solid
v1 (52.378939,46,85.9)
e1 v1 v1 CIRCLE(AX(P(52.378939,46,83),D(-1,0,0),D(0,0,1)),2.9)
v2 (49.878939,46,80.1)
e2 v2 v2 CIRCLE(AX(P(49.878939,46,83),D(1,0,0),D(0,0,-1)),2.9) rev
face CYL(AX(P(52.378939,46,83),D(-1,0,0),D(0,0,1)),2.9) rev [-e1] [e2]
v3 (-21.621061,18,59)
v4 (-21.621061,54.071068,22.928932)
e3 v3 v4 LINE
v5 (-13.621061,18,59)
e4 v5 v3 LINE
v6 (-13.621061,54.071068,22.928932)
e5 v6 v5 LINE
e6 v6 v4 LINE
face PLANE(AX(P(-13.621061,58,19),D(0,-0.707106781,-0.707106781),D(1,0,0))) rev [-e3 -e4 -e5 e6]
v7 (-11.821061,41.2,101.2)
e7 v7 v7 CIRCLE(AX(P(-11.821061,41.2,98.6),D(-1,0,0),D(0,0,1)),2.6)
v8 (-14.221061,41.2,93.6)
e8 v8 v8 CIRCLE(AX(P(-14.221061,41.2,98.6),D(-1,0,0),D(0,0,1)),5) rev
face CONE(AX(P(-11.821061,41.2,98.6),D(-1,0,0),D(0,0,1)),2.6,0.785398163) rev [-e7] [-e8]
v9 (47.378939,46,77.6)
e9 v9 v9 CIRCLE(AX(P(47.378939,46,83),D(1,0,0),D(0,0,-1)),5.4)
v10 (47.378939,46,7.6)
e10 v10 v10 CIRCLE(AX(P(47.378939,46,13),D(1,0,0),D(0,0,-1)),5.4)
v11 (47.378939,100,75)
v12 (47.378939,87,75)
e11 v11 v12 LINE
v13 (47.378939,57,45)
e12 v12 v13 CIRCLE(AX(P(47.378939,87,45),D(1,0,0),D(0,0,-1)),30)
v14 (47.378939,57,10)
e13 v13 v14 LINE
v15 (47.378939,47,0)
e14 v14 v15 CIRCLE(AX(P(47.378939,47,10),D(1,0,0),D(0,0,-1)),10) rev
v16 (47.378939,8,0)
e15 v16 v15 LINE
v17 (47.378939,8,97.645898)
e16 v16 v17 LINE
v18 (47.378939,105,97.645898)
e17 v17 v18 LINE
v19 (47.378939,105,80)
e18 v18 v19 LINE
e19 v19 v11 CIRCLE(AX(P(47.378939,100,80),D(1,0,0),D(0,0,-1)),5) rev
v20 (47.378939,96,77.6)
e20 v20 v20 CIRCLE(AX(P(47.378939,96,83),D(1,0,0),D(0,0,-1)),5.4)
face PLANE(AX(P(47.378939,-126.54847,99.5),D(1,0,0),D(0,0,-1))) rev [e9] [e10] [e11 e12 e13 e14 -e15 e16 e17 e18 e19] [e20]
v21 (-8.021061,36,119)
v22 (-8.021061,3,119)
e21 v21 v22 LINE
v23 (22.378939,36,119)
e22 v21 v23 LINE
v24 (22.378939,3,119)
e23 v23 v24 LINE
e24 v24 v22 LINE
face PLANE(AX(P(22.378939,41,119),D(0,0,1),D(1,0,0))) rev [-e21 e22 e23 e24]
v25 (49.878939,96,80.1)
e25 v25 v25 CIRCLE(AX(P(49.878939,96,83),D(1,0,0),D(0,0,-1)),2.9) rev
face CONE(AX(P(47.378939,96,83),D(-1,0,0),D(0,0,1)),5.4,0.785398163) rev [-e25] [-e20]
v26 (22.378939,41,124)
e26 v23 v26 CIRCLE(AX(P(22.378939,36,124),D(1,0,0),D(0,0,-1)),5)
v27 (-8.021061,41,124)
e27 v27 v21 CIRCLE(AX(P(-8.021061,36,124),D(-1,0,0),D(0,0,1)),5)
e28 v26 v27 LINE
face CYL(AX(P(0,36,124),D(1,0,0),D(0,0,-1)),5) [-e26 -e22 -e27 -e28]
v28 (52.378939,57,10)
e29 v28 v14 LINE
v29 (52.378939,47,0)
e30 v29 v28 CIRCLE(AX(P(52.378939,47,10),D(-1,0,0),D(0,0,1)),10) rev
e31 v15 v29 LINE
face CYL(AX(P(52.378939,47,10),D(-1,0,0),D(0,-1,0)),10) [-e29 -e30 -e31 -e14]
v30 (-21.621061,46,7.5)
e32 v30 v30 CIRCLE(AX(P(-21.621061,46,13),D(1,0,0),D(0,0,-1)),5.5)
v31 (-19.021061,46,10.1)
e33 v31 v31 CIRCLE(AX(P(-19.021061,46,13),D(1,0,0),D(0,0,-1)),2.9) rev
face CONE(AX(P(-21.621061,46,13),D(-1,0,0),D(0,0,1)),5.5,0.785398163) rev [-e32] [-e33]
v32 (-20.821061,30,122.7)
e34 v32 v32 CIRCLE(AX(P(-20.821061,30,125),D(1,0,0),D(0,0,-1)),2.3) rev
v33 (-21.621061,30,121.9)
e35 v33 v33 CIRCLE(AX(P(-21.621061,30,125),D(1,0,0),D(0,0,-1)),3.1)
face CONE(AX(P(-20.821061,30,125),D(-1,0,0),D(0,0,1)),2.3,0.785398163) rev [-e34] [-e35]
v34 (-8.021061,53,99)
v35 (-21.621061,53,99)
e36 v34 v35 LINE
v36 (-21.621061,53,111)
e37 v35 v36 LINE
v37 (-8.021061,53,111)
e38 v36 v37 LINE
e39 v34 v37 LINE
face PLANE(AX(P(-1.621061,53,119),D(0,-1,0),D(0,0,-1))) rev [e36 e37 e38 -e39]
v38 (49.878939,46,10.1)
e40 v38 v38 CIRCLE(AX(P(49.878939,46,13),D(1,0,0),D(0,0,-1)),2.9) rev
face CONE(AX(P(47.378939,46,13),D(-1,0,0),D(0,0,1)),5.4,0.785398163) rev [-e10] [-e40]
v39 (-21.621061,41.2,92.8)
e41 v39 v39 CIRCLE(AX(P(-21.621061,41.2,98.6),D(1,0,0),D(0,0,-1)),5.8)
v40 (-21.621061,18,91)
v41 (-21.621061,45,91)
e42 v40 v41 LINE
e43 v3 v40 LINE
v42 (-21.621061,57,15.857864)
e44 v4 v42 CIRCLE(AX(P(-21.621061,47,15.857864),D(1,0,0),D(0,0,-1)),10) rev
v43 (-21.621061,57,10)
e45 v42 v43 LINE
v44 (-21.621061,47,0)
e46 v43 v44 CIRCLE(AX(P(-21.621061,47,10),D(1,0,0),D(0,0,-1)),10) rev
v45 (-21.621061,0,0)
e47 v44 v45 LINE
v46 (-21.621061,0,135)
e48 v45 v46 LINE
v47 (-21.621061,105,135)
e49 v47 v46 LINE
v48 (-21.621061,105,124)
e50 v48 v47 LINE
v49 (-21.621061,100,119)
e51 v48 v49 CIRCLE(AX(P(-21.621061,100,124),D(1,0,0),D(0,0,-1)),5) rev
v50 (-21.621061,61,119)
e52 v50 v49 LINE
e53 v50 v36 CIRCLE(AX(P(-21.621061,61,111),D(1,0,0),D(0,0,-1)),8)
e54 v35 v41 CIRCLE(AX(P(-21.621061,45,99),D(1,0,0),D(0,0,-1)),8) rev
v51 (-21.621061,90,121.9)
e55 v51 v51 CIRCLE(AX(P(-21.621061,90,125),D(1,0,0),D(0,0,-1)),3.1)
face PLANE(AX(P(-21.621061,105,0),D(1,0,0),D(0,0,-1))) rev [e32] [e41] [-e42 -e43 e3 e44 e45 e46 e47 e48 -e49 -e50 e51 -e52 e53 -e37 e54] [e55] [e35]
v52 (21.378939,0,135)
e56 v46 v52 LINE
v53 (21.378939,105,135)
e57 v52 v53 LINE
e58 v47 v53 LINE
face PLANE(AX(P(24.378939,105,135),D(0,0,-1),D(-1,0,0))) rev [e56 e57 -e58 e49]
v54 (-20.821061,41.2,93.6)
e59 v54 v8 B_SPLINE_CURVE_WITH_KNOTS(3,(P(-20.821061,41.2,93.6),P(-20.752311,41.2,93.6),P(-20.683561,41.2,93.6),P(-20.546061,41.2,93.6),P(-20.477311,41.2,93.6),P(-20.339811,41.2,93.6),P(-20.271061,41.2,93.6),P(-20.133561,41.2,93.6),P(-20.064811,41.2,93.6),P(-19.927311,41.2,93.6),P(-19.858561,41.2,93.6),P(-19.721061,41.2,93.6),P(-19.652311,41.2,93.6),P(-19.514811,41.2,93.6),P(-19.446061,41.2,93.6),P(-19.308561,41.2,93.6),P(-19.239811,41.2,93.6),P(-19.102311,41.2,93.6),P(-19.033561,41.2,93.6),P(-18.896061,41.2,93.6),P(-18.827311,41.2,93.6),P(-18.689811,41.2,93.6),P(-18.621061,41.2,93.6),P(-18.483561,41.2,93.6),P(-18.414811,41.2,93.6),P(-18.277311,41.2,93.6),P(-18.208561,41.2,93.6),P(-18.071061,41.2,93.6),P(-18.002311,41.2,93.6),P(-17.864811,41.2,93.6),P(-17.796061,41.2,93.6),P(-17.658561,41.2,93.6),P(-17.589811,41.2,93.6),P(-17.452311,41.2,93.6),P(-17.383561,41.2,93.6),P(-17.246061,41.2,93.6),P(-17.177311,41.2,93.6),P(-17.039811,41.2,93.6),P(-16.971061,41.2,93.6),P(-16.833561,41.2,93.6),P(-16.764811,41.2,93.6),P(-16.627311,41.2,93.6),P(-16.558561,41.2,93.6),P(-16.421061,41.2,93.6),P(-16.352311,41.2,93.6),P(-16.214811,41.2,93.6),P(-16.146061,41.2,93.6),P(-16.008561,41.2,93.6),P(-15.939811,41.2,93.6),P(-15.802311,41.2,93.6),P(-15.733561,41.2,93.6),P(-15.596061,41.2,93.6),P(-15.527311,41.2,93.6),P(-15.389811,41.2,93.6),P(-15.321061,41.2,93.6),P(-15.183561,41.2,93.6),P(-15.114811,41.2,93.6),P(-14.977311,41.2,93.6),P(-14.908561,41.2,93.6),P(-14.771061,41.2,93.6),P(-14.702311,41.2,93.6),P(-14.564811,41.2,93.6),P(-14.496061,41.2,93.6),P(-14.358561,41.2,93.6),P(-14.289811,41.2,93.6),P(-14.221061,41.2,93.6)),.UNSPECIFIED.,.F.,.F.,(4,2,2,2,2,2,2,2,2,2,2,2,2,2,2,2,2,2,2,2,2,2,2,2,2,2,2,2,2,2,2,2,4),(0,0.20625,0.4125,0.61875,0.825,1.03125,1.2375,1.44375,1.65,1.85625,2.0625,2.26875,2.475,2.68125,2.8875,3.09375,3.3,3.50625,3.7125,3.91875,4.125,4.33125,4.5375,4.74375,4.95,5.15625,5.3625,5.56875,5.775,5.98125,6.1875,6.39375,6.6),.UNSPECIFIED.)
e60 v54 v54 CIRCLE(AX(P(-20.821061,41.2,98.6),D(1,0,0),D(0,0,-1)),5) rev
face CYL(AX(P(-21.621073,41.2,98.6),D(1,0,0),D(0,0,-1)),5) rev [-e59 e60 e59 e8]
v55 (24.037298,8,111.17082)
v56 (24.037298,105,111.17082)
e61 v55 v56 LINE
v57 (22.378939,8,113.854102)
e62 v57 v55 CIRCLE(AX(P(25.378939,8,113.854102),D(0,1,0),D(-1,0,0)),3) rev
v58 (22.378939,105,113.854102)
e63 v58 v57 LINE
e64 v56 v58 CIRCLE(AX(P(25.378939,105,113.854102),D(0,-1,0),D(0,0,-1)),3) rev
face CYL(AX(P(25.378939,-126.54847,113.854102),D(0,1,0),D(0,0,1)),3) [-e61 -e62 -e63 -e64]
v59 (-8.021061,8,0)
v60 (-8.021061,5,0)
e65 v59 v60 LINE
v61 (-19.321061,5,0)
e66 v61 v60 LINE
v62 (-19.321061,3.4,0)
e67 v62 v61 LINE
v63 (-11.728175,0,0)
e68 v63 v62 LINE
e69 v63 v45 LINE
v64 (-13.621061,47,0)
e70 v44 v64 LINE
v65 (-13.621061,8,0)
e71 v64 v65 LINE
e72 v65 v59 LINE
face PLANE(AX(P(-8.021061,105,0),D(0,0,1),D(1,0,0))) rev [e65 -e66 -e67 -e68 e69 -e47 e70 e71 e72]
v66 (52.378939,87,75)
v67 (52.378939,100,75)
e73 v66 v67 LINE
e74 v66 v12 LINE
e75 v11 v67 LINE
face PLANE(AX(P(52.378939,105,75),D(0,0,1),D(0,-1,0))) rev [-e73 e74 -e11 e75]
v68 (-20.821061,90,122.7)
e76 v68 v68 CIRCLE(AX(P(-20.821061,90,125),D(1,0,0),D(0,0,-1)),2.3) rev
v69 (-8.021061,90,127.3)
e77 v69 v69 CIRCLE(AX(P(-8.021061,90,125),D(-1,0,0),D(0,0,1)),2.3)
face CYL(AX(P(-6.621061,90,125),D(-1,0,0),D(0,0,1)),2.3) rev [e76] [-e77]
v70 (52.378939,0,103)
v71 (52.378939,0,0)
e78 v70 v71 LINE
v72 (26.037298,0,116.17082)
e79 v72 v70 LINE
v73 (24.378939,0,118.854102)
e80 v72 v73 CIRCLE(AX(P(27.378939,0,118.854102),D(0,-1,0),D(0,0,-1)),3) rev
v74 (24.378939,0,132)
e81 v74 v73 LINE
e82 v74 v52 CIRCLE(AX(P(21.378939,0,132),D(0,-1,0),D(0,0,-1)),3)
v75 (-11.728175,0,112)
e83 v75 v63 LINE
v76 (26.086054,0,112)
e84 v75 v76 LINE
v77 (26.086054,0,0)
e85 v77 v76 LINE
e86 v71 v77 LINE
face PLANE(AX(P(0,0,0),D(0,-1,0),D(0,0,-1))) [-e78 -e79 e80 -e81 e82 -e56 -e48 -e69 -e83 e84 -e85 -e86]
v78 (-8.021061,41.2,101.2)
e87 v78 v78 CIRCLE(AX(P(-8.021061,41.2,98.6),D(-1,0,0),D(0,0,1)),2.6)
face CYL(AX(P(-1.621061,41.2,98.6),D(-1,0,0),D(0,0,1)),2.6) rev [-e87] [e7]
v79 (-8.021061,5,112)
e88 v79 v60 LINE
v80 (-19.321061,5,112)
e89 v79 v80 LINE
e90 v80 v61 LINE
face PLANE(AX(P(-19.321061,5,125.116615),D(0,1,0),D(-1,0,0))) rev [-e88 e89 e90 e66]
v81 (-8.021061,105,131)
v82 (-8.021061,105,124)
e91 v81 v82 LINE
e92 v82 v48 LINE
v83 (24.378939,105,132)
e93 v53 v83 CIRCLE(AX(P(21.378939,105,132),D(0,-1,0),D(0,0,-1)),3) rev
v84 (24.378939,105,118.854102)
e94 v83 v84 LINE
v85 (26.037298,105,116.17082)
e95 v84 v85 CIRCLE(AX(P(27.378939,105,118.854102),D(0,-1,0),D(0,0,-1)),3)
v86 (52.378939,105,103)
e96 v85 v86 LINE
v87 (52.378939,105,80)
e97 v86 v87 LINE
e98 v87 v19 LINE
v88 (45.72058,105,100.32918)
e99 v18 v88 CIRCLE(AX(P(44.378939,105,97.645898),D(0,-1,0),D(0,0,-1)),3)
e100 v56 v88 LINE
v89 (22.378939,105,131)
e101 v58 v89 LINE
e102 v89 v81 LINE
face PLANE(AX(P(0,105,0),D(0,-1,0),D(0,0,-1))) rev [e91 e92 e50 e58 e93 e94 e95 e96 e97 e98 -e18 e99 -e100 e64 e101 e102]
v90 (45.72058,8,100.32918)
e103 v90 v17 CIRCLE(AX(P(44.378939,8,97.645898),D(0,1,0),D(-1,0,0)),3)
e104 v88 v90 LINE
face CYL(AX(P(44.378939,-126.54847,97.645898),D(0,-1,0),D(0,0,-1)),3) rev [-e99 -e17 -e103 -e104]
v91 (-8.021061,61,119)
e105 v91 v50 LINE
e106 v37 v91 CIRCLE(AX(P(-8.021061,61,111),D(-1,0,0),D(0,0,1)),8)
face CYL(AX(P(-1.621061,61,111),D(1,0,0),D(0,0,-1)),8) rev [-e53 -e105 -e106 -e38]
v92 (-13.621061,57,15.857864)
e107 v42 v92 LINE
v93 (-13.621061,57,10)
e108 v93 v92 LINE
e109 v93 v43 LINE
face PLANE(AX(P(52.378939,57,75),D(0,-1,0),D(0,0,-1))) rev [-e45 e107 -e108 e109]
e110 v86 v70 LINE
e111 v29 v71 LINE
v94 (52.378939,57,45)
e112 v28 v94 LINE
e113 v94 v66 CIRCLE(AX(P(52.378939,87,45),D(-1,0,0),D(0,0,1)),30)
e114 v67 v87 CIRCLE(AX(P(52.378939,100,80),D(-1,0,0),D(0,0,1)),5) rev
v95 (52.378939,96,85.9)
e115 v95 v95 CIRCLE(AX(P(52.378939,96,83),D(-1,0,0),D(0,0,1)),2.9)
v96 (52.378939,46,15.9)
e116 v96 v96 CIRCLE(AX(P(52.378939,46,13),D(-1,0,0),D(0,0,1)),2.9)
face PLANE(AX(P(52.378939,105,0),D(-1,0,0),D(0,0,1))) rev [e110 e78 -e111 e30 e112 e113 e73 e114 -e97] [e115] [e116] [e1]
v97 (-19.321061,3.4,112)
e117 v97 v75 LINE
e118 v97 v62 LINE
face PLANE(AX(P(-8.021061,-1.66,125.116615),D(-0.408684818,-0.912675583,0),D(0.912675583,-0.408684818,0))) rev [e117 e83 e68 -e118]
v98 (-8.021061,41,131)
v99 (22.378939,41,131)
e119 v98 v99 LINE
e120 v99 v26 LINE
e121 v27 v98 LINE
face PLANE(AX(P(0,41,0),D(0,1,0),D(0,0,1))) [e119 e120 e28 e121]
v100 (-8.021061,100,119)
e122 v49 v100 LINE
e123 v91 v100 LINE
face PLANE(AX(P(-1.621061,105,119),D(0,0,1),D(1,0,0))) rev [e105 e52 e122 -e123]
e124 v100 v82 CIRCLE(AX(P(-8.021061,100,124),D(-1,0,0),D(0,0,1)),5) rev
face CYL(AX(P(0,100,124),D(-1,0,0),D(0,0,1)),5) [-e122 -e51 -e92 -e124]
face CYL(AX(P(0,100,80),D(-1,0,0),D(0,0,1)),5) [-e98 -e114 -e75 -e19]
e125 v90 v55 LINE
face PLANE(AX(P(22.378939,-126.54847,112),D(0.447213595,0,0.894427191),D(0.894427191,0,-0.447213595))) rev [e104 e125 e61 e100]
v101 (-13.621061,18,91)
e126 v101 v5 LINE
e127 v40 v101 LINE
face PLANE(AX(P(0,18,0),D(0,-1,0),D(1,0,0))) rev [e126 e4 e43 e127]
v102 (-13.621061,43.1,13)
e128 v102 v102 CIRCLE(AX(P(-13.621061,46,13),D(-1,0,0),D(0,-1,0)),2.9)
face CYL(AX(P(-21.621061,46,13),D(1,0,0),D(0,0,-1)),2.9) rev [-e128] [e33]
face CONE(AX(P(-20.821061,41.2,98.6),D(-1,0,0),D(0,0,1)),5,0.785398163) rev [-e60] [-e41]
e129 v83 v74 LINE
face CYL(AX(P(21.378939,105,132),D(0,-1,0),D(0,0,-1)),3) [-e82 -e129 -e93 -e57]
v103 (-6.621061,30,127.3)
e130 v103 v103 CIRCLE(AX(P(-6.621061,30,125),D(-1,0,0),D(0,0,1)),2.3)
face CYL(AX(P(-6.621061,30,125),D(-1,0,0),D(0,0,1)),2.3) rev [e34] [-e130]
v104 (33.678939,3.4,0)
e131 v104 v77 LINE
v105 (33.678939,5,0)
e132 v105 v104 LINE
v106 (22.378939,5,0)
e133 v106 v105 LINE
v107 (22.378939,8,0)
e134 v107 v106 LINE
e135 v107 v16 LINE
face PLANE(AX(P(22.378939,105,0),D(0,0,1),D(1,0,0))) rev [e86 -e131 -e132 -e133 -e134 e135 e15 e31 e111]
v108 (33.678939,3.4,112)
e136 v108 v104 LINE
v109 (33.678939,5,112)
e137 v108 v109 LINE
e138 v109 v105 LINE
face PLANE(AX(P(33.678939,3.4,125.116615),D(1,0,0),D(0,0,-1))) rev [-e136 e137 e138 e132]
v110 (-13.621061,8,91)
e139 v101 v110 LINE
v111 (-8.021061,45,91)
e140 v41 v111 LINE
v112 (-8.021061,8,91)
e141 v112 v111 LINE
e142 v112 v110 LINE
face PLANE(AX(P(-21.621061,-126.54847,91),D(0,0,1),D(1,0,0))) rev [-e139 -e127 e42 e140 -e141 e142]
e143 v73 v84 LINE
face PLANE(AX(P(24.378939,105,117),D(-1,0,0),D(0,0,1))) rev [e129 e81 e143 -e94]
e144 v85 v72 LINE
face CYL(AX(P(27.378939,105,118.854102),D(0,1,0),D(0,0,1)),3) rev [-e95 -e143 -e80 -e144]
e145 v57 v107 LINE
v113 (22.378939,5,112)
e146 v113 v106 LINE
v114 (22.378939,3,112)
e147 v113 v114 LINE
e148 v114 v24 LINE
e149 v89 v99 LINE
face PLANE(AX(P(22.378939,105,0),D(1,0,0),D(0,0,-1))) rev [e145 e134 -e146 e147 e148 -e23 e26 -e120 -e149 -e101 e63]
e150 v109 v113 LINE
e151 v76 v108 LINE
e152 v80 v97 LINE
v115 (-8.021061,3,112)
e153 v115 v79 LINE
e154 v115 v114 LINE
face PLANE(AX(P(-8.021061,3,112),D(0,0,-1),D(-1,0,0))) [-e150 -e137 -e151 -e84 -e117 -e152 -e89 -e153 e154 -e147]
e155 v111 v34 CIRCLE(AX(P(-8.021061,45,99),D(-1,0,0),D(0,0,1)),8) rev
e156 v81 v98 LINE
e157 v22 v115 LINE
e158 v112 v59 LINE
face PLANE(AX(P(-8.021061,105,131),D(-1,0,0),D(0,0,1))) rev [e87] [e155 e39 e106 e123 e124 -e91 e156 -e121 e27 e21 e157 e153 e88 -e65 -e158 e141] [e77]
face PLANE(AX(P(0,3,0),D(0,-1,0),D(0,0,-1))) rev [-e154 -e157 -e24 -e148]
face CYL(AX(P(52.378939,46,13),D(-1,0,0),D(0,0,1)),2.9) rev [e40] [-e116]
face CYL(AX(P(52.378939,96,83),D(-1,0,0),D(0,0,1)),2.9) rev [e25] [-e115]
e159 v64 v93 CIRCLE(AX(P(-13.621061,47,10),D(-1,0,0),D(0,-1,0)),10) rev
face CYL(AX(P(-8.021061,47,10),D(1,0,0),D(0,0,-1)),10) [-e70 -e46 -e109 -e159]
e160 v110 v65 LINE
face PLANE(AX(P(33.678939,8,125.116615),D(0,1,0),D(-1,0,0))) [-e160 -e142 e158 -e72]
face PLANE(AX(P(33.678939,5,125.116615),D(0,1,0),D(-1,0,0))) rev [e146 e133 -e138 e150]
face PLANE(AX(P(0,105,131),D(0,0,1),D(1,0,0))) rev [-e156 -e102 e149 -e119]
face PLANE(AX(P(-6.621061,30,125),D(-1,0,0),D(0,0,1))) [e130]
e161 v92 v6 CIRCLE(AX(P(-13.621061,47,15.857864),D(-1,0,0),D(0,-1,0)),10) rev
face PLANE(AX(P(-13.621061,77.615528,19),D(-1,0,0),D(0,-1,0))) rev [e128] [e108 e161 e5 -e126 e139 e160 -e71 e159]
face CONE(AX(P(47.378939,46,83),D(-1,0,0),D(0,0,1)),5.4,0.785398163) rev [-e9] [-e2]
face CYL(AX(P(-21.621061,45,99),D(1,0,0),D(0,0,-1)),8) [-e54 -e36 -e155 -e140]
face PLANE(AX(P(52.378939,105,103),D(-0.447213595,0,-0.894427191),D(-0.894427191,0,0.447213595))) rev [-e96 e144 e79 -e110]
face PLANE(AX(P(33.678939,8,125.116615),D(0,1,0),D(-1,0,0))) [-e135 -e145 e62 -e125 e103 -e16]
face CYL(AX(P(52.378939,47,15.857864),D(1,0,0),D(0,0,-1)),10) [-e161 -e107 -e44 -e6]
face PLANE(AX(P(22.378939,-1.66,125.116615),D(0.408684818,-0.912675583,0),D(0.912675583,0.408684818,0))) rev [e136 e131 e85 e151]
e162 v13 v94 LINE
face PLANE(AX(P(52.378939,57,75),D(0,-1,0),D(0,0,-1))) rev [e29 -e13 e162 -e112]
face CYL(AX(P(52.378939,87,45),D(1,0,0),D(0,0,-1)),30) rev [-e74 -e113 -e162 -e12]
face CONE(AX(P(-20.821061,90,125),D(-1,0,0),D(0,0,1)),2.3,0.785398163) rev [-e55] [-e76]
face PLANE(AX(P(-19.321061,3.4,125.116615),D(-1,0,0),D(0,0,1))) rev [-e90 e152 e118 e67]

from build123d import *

# Parameters (mm, degrees)
EXTRUDE_1_DEPTH          = 105
SKETCH_7_W               = 30.4
SKETCH_7_H               = 19
EXTRUDE_2_DEPTH          = 3
SKETCH_8_W               = 30.4
SKETCH_8_H               = 12
EXTRUDE_3_DEPTH          = 38
FILLET_1_R               = 5
CUT_EXTRUDE_1_DEPTH      = 112
CUT_EXTRUDE_2_DEPTH      = 97
CUT_EXTRUDE_4_DEPTH      = 187.349134691
CUT_EXTRUDE_4_DEPTH_BACK = 6.8
SKETCH_11_R              = 5
FILLET_3_R               = 3
SKETCH_12_R              = 2.6
CUT_EXTRUDE_5_DEPTH      = 20
CHAMFER_1_SIZE           = 3
SKETCH_13_R              = 2.9
CUT_EXTRUDE_6_DEPTH      = 187.349134691
CHAMFER_3_SIZE           = 2.5
SKETCH_16_W              = 75
SKETCH_16_H              = 48
CUT_EXTRUDE_9_DEPTH      = 187.349134691
FILLET_4_R               = 30
SKETCH_17_W              = 28
SKETCH_17_H              = 52
CUT_EXTRUDE_10_DEPTH     = 20
FILLET_5_R               = 8
SKETCH_18_W              = 8
SKETCH_18_H              = 19
EXTRUDE_4_DEPTH          = 49
CHAMFER_4_SIZE           = 50
FILLET_6_R               = 10
SKETCH_19_R              = 2.9
CUT_EXTRUDE_11_DEPTH     = 187.349134691
CHAMFER_5_SIZE           = 2.6
SKETCH_21_R              = 2.3
CUT_EXTRUDE_13_DEPTH     = 15
FILLET_7_R               = 5
CHAMFER_6_SIZE           = 0.8
SKETCH_22_W              = 8
SKETCH_22_H              = 43.683816014
EXTRUDE_5_DEPTH          = 10
FILLET_8_R               = 10


with BuildPart() as part:
    # Эскиз2 → Бобышка-Вытянуть1 (new body)
    with BuildSketch(Plane(origin=(0, 0, 0), x_dir=(1, 0, 0), z_dir=(0, 1, 0))):
        Polygon((52.378939236, 0), (52.378939236, -103), (24.378939236, -117), (24.378939236, -135), (0, -135), (-21.621060764, -135), (-21.621060764, 0), (-8.021060764, 0), (-8.021060764, -131), (0, -131), (22.378939236, -131), (22.378939236, 0), align=None)
    extrude(amount=EXTRUDE_1_DEPTH)



with BuildPart() as body_2:
    # Эскиз7 → Бобышка-Вытянуть2 (new body)
    with BuildSketch(Plane.XZ):
        with Locations((7.178939236, 121.5)):
            Rectangle(SKETCH_7_W, SKETCH_7_H)
    extrude(amount=-EXTRUDE_2_DEPTH)


with BuildPart() as part_1:
    add(part.part)

    add(body_2.part)  # Бобышка-Вытянуть3 merges body 2
    # Эскиз8 → Бобышка-Вытянуть3 (add)
    with BuildSketch(Plane(origin=(0, 3, 0), x_dir=(1, 0, 0), z_dir=(0, 1, 0))):
        with Locations((7.178939236, -125)):
            Rectangle(SKETCH_8_W, SKETCH_8_H)
    extrude(amount=EXTRUDE_3_DEPTH)

    # Скругление1
    fillet_1_edges = [part_1.edges().sort_by_distance(p)[0] for p in [
        (7.178939236, 41, 119),
    ]]
    fillet(fillet_1_edges, radius=FILLET_1_R)

    # Эскиз3 → Вырез-Вытянуть1 (cut)
    with BuildSketch(Plane(origin=(0, 0, 0), x_dir=(-1, 0, 0), z_dir=(0, 0, -1))):
        Polygon((8.021060764, -1.66), (19.321060764, 3.4), (19.321060764, 5), (8.021060764, 5), align=None)
        Polygon((-33.678939236, 5), (-22.378939236, 5), (-22.378939236, -1.66), (-33.678939236, 3.4), align=None)
    extrude(amount=-CUT_EXTRUDE_1_DEPTH, mode=Mode.SUBTRACT)

    # Эскиз9 → Вырез-Вытянуть2 (cut)
    with BuildSketch(Plane(origin=(0, 105, 0), x_dir=(1, 0, 0), z_dir=(0, 1, 0))):
        Polygon((-21.621060764, 0), (-21.621060764, -91), (22.378939236, -91), (22.378939236, -112), (47.378939236, -99.5), (47.378939236, 0), align=None)
    extrude(amount=-CUT_EXTRUDE_2_DEPTH, mode=Mode.SUBTRACT)

    # Эскиз11 → Вырез-Вытянуть4 (cut, two sides: drawn at the far end of the back side and taken through both)
    with BuildSketch(Plane.ZY.offset(21.621060764).offset(-CUT_EXTRUDE_4_DEPTH_BACK)):
        with Locations(Location((98.6, 41.2, 0), (0, 0, 180))):
            Circle(SKETCH_11_R)
    extrude(amount=CUT_EXTRUDE_4_DEPTH + CUT_EXTRUDE_4_DEPTH_BACK, mode=Mode.SUBTRACT)

    # Скругление3
    fillet_3_edges = [part_1.edges().sort_by_distance(p)[0] for p in [
        (47.378939236, 56.5, 99.5),
        (22.378939236, 56.5, 112),
        (24.378939236, 52.5, 135),
        (24.378939236, 52.5, 117),
    ]]
    fillet(fillet_3_edges, radius=FILLET_3_R)

    # Эскиз12 → Вырез-Вытянуть5 (cut)
    with BuildSketch(Plane.ZY.offset(21.621060764)):
        with Locations((98.6, 41.2)):
            Circle(SKETCH_12_R)
    extrude(amount=-CUT_EXTRUDE_5_DEPTH, mode=Mode.SUBTRACT)

    # Фаска1
    # the kernel refuses this chamfer: 3 mm, written as the material it takes off along each edge
    with BuildSketch(Plane(origin=(-14.821060764, 41.2, 98.6), x_dir=(0, 0, 1), z_dir=(0, -1, 0))) as chamfer_1_piece_1_section:
        Polygon((2.6, -CHAMFER_1_SIZE), (2.6 + CHAMFER_1_SIZE, 0), (2.6, 0), align=None)
    chamfer_1_piece_1 = revolve(axis=Axis((-14.821060764, 41.2, 98.6), (-1, 0, 0)), mode=Mode.PRIVATE)
    chamfer_1_piece_1 = chamfer_1_piece_1 & Plane(origin=(-13.01179882, 41.2, 98.6), x_dir=(0, 0, -1), z_dir=(-1, 0, 0)) * Cylinder(5, 23, mode=Mode.PRIVATE)
    add(chamfer_1_piece_1, mode=Mode.SUBTRACT)

    # Эскиз13 → Вырез-Вытянуть6 (cut, through all)
    with BuildSketch(Plane.ZY.offset(21.621060764)):
        with Locations((83, 46)):
            Circle(SKETCH_13_R)
        with Locations((13, 46)):
            Circle(SKETCH_13_R)
        with Locations((83, 96)):
            Circle(SKETCH_13_R)
    extrude(amount=-CUT_EXTRUDE_6_DEPTH, mode=Mode.SUBTRACT)

    # Фаска3
    chamfer_3_edges = [part_1.edges().sort_by_distance(p)[0] for p in [
        (47.378939236, 96, 80.1),
        (47.378939236, 46, 10.1),
        (47.378939236, 46, 80.1),
    ]]
    chamfer(chamfer_3_edges, length=CHAMFER_3_SIZE)

    # Эскиз16 → Вырез-Вытянуть9 (cut, through all)
    with BuildSketch(Plane.ZY.offset(21.621060764)):
        with Locations((37.5, 81)):
            Rectangle(SKETCH_16_W, SKETCH_16_H)
    extrude(amount=-CUT_EXTRUDE_9_DEPTH, mode=Mode.SUBTRACT)

    # Скругление4
    fillet_4_edges = [part_1.edges().sort_by_distance(p)[0] for p in [
        (49.878939236, 57, 75),
    ]]
    fillet(fillet_4_edges, radius=FILLET_4_R)

    # Эскиз17 → Вырез-Вытянуть10 (cut)
    with BuildSketch(Plane.ZY.offset(21.621060764)):
        with Locations((105, 79)):
            Rectangle(SKETCH_17_W, SKETCH_17_H)
    extrude(amount=-CUT_EXTRUDE_10_DEPTH, mode=Mode.SUBTRACT)

    # Скругление5
    fillet_5_edges = [part_1.edges().sort_by_distance(p)[0] for p in [
        (-14.821060764, 53, 91),
        (-14.821060764, 53, 119),
    ]]
    fillet(fillet_5_edges, radius=FILLET_5_R)

    # Эскиз18 → Бобышка-Вытянуть4 (add)
    with BuildSketch(Plane(origin=(0, 8, 0), x_dir=(1, 0, 0), z_dir=(0, 1, 0))):
        with Locations((-17.621060764, -9.5)):
            Rectangle(SKETCH_18_W, SKETCH_18_H)
    extrude(amount=EXTRUDE_4_DEPTH)

    # Фаска4
    # the kernel refuses this chamfer: 50 mm, written as the material it adds along each edge
    with BuildSketch(Plane(origin=(-13.621060764, 8, 19), x_dir=(0, 0.9996219169112966, -0.027495876610586386), z_dir=(-1, 0, 0))) as chamfer_4_piece_1_section:
        Polygon((CHAMFER_4_SIZE * 0.999621916911, -CHAMFER_4_SIZE * 0.0274958766106), (-CHAMFER_4_SIZE * 0.0274958766106, -CHAMFER_4_SIZE * 0.999621916911), (0, 0), align=None)
    chamfer_4_piece_1 = extrude(amount=8, mode=Mode.PRIVATE)
    chamfer_4_piece_1 = split(chamfer_4_piece_1, bisect_by=Plane(origin=(-17.621060764, 57, 35.555220818), z_dir=(0, -1, 0)), keep=Keep.TOP, mode=Mode.PRIVATE)
    add(chamfer_4_piece_1)

    # Скругление6
    fillet_6_edges = [part_1.edges().sort_by_distance(p)[0] for p in [
        (49.878939236, 57, 0),
        (-17.621060764, 57, 0),
    ]]
    fillet(fillet_6_edges, radius=FILLET_6_R)

    # Эскиз19 → Вырез-Вытянуть11 (cut, through all)
    with BuildSketch(Plane(origin=(52.378939236, 0, 0), x_dir=(0, 0, -1), z_dir=(1, 0, 0))):
        with Locations(Location((-13, 46, 0), (0, 0, 180))):
            Circle(SKETCH_19_R)
    extrude(amount=-CUT_EXTRUDE_11_DEPTH, mode=Mode.SUBTRACT)

    # Фаска5
    chamfer_5_edges = [part_1.edges().sort_by_distance(p)[0] for p in [
        (-21.621060764, 46, 10.1),
    ]]
    chamfer(chamfer_5_edges, length=CHAMFER_5_SIZE)

    # Эскиз21 → Вырез-Вытянуть13 (cut)
    with BuildSketch(Plane.ZY.offset(21.621060764)):
        with Locations((125, 30)):
            Circle(SKETCH_21_R)
        with Locations((125, 90)):
            Circle(SKETCH_21_R)
    extrude(amount=-CUT_EXTRUDE_13_DEPTH, mode=Mode.SUBTRACT)

    # Скругление7
    fillet_7_edges = [part_1.edges().sort_by_distance(p)[0] for p in [
        (49.878939236, 105, 75),
        (-14.821060764, 105, 119),
    ]]
    fillet(fillet_7_edges, radius=FILLET_7_R)

    # Фаска6
    chamfer_6_edges = [part_1.edges().sort_by_distance(p)[0] for p in [
        (-21.621060764, 41.2, 103.6),
        (-21.621060764, 30, 122.7),
        (-21.621060764, 90, 122.7),
    ]]
    chamfer(chamfer_6_edges, length=CHAMFER_6_SIZE)

    # Эскиз22 → Бобышка-Вытянуть5 (add)
    with BuildSketch(Plane(origin=(0, 8, 0), x_dir=(1, 0, 0), z_dir=(0, 1, 0))):
        with Locations((-17.621060764, -69.158091993)):
            Rectangle(SKETCH_22_W, SKETCH_22_H)
    extrude(amount=EXTRUDE_5_DEPTH)

    # Скругление8
    fillet_8_edges = [part_1.edges().sort_by_distance(p)[0] for p in [
        (-17.621060764, 57, 20),
    ]]
    fillet(fillet_8_edges, radius=FILLET_8_R)


solid = part_1.part
